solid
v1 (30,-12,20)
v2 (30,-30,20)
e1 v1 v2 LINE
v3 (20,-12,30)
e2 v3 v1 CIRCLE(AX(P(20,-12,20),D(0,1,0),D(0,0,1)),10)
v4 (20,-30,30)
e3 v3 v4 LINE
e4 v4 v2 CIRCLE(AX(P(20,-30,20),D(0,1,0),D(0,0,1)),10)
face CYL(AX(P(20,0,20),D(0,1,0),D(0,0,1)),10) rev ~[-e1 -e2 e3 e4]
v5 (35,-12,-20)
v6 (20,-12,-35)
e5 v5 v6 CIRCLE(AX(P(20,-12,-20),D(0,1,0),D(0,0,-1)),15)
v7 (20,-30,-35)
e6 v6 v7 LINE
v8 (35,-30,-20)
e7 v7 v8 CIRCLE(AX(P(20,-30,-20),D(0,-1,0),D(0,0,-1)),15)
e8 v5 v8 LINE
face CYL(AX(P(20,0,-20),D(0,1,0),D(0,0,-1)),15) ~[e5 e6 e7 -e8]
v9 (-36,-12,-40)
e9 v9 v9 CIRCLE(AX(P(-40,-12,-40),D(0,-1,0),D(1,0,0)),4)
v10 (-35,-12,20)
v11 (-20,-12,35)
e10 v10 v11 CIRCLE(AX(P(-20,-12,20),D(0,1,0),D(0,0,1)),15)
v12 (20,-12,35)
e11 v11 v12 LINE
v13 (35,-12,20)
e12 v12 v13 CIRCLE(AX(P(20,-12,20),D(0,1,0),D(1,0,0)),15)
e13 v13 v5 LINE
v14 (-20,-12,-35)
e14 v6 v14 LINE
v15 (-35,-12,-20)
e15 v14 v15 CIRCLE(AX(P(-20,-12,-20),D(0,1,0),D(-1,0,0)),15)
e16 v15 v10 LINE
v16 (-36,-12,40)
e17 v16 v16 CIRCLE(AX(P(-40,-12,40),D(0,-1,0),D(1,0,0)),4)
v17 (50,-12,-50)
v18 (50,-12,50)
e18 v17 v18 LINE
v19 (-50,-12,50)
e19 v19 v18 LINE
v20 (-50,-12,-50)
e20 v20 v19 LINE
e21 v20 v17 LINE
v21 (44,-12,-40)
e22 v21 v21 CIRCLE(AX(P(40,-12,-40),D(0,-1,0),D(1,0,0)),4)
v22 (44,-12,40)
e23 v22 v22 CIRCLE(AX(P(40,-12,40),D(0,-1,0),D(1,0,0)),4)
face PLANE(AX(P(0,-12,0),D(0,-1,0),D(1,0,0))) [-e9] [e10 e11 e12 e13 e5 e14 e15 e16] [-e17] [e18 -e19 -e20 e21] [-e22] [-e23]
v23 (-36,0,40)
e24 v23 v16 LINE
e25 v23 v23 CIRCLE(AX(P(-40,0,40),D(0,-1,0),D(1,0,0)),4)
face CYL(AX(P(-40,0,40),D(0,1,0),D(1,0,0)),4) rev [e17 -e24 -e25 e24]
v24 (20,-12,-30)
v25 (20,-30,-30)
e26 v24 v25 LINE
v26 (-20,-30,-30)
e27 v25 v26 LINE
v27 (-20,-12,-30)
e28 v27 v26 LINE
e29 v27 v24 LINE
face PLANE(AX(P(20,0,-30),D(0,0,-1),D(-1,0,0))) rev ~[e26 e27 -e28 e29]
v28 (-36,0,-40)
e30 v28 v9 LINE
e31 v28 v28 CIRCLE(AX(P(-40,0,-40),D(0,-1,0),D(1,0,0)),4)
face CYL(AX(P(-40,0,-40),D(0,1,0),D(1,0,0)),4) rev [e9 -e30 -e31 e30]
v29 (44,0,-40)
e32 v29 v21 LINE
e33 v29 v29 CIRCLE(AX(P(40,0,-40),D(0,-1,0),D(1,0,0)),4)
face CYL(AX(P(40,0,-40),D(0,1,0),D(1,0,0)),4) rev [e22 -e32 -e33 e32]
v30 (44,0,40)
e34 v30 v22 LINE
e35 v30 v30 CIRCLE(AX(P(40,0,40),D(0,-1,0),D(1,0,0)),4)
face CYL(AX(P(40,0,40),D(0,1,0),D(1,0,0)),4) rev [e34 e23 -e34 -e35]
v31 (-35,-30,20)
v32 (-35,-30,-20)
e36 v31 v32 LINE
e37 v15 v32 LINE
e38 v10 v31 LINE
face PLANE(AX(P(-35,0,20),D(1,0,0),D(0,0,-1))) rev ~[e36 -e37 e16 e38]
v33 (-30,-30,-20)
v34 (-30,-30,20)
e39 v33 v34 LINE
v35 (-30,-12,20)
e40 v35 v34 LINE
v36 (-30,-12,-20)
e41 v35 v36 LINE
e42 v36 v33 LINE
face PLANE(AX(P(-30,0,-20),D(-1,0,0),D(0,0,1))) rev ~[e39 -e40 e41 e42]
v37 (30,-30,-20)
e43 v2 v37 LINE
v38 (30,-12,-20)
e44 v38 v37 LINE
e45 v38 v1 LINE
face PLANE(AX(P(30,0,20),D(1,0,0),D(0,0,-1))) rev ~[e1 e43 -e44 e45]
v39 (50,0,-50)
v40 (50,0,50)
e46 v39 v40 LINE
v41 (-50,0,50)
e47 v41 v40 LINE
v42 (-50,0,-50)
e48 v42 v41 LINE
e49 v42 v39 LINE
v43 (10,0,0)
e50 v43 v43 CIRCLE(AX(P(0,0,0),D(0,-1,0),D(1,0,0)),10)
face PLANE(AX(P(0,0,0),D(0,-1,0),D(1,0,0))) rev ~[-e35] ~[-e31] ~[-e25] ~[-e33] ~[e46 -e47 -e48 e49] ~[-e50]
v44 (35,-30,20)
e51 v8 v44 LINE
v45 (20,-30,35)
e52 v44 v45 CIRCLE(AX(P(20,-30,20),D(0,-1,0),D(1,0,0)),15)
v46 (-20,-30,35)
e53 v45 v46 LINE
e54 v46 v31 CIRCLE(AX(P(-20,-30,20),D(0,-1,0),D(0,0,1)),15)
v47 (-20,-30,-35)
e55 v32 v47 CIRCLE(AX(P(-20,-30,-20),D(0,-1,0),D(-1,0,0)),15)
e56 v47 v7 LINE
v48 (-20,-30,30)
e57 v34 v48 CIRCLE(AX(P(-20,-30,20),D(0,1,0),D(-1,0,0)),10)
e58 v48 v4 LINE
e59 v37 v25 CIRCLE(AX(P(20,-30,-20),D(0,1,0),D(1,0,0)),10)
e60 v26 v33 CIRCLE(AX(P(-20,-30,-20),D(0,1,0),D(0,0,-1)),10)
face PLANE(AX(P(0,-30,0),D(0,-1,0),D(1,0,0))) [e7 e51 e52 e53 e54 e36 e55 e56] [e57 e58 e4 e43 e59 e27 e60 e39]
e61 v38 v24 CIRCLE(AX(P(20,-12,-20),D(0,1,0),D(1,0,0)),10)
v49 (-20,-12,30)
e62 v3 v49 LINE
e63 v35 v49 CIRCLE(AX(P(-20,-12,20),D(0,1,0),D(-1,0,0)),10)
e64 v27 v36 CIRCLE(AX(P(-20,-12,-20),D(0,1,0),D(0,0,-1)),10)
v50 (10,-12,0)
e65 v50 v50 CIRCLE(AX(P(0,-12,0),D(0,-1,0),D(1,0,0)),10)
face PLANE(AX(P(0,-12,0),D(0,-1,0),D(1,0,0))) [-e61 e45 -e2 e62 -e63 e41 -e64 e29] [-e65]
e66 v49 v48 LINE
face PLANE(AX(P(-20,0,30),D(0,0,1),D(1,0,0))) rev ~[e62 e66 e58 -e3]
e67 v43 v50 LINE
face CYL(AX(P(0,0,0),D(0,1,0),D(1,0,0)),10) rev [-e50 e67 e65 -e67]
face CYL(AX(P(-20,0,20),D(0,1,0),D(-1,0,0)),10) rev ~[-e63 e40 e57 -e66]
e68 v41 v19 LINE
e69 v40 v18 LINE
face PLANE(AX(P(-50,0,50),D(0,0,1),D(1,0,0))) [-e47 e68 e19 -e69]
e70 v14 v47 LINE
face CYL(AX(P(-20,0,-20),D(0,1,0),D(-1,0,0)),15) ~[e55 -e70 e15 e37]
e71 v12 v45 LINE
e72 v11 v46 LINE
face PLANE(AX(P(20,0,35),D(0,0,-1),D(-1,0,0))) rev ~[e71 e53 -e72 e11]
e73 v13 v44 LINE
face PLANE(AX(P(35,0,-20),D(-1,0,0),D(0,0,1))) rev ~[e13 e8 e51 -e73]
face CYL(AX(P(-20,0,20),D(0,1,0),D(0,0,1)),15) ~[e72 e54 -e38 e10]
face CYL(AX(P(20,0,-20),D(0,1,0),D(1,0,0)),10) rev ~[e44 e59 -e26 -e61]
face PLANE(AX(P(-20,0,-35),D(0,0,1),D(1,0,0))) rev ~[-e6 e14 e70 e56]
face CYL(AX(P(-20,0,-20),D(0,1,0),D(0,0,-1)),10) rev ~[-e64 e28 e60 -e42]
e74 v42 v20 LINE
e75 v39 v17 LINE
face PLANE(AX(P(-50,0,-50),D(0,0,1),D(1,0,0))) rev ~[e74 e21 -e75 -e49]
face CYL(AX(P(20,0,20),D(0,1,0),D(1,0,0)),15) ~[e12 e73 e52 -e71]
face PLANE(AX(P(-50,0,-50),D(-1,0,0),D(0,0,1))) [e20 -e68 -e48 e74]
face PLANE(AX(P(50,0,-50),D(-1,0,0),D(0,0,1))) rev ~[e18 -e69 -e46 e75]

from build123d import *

# Parameters (mm, degrees)
F0_W     = 100
F0_H     = 100
F0_R     = 4
F0_R_2   = 10
F1_DEPTH = 12
F2_DEPTH = 30
F3_DEPTH = 25


with BuildPart() as f1:
    # F0 (on Front) → F1 (new body)
    with BuildSketch(Plane.XZ):
        Rectangle(F0_W, F0_H)
        with Locations((-40, -40)):
            Circle(F0_R, mode=Mode.SUBTRACT)
        with Locations((40, -40)):
            Circle(F0_R, mode=Mode.SUBTRACT)
        with Locations((-40, 40)):
            Circle(F0_R, mode=Mode.SUBTRACT)
        with BuildLine():
            Line((-35, -20), (-35, 0))
            Line((-35, 0), (-35, 20))
            ThreePointArc((-35, 20), (-30.6066017178, 30.6066017178), (-20, 35))
            Line((-20, 35), (0, 35))
            Line((0, 35), (20, 35))
            ThreePointArc((20, 35), (30.6066017178, 30.6066017178), (35, 20))
            Line((35, 20), (35, 0))
            Line((35, 0), (35, -20))
            ThreePointArc((35, -20), (30.6066017178, -30.6066017178), (20, -35))
            Line((20, -35), (0, -35))
            Line((0, -35), (-20, -35))
            ThreePointArc((-20, -35), (-30.6066017178, -30.6066017178), (-35, -20))
        make_face(mode=Mode.SUBTRACT)
        with Locations((40, 40)):
            Circle(F0_R, mode=Mode.SUBTRACT)
        with BuildLine():
            Line((-35, 20), (-35, 0))
            Line((-35, 0), (-35, -20))
            ThreePointArc((-35, -20), (-30.6066017178, -30.6066017178), (-20, -35))
            Line((-20, -35), (0, -35))
            Line((0, -35), (20, -35))
            ThreePointArc((20, -35), (30.6066017178, -30.6066017178), (35, -20))
            Line((35, -20), (35, 0))
            Line((35, 0), (35, 20))
            ThreePointArc((35, 20), (30.6066017178, 30.6066017178), (20, 35))
            Line((20, 35), (0, 35))
            Line((0, 35), (-20, 35))
            ThreePointArc((-20, 35), (-30.6066017178, 30.6066017178), (-35, 20))
        make_face()
        with BuildLine():
            Line((-30, -20), (-30, 0))
            Line((-30, 0), (-30, 20))
            ThreePointArc((-30, 20), (-27.0710678119, 27.0710678119), (-20, 30))
            Line((-20, 30), (0, 30))
            Line((0, 30), (20, 30))
            ThreePointArc((20, 30), (27.0710678119, 27.0710678119), (30, 20))
            Line((30, 20), (30, 0))
            Line((30, 0), (30, -20))
            ThreePointArc((30, -20), (27.0710678119, -27.0710678119), (20, -30))
            Line((20, -30), (0, -30))
            Line((0, -30), (-20, -30))
            ThreePointArc((-20, -30), (-27.0710678119, -27.0710678119), (-30, -20))
        make_face(mode=Mode.SUBTRACT)
        with BuildLine():
            Line((-30, 20), (-30, 0))
            Line((-30, 0), (-30, -20))
            ThreePointArc((-30, -20), (-27.0710678119, -27.0710678119), (-20, -30))
            Line((-20, -30), (0, -30))
            Line((0, -30), (20, -30))
            ThreePointArc((20, -30), (27.0710678119, -27.0710678119), (30, -20))
            Line((30, -20), (30, 0))
            Line((30, 0), (30, 20))
            ThreePointArc((30, 20), (27.0710678119, 27.0710678119), (20, 30))
            Line((20, 30), (0, 30))
            Line((0, 30), (-20, 30))
            ThreePointArc((-20, 30), (-27.0710678119, 27.0710678119), (-30, 20))
        make_face()
        Circle(F0_R_2, mode=Mode.SUBTRACT)
    extrude(amount=F1_DEPTH)

    # F0 (on Front) → F2 (join)
    with BuildSketch(Plane.XZ):
        with BuildLine():
            Line((-35, 20), (-35, 0))
            Line((-35, 0), (-35, -20))
            ThreePointArc((-35, -20), (-30.6066017178, -30.6066017178), (-20, -35))
            Line((-20, -35), (0, -35))
            Line((0, -35), (20, -35))
            ThreePointArc((20, -35), (30.6066017178, -30.6066017178), (35, -20))
            Line((35, -20), (35, 0))
            Line((35, 0), (35, 20))
            ThreePointArc((35, 20), (30.6066017178, 30.6066017178), (20, 35))
            Line((20, 35), (0, 35))
            Line((0, 35), (-20, 35))
            ThreePointArc((-20, 35), (-30.6066017178, 30.6066017178), (-35, 20))
        make_face()
        with BuildLine():
            Line((-30, -20), (-30, 0))
            Line((-30, 0), (-30, 20))
            ThreePointArc((-30, 20), (-27.0710678119, 27.0710678119), (-20, 30))
            Line((-20, 30), (0, 30))
            Line((0, 30), (20, 30))
            ThreePointArc((20, 30), (27.0710678119, 27.0710678119), (30, 20))
            Line((30, 20), (30, 0))
            Line((30, 0), (30, -20))
            ThreePointArc((30, -20), (27.0710678119, -27.0710678119), (20, -30))
            Line((20, -30), (0, -30))
            Line((0, -30), (-20, -30))
            ThreePointArc((-20, -30), (-27.0710678119, -27.0710678119), (-30, -20))
        make_face(mode=Mode.SUBTRACT)
    extrude(amount=F2_DEPTH)

    # F0 (on Front) → F3 (cut)
    with BuildSketch(Plane.XZ):
        with Locations((-40, 40)):
            Circle(F0_R)
        with Locations((40, 40)):
            Circle(F0_R)
        with Locations((-40, -40)):
            Circle(F0_R)
        with Locations((40, -40)):
            Circle(F0_R)
    extrude(amount=-F3_DEPTH, mode=Mode.SUBTRACT)


solid = f1.part
